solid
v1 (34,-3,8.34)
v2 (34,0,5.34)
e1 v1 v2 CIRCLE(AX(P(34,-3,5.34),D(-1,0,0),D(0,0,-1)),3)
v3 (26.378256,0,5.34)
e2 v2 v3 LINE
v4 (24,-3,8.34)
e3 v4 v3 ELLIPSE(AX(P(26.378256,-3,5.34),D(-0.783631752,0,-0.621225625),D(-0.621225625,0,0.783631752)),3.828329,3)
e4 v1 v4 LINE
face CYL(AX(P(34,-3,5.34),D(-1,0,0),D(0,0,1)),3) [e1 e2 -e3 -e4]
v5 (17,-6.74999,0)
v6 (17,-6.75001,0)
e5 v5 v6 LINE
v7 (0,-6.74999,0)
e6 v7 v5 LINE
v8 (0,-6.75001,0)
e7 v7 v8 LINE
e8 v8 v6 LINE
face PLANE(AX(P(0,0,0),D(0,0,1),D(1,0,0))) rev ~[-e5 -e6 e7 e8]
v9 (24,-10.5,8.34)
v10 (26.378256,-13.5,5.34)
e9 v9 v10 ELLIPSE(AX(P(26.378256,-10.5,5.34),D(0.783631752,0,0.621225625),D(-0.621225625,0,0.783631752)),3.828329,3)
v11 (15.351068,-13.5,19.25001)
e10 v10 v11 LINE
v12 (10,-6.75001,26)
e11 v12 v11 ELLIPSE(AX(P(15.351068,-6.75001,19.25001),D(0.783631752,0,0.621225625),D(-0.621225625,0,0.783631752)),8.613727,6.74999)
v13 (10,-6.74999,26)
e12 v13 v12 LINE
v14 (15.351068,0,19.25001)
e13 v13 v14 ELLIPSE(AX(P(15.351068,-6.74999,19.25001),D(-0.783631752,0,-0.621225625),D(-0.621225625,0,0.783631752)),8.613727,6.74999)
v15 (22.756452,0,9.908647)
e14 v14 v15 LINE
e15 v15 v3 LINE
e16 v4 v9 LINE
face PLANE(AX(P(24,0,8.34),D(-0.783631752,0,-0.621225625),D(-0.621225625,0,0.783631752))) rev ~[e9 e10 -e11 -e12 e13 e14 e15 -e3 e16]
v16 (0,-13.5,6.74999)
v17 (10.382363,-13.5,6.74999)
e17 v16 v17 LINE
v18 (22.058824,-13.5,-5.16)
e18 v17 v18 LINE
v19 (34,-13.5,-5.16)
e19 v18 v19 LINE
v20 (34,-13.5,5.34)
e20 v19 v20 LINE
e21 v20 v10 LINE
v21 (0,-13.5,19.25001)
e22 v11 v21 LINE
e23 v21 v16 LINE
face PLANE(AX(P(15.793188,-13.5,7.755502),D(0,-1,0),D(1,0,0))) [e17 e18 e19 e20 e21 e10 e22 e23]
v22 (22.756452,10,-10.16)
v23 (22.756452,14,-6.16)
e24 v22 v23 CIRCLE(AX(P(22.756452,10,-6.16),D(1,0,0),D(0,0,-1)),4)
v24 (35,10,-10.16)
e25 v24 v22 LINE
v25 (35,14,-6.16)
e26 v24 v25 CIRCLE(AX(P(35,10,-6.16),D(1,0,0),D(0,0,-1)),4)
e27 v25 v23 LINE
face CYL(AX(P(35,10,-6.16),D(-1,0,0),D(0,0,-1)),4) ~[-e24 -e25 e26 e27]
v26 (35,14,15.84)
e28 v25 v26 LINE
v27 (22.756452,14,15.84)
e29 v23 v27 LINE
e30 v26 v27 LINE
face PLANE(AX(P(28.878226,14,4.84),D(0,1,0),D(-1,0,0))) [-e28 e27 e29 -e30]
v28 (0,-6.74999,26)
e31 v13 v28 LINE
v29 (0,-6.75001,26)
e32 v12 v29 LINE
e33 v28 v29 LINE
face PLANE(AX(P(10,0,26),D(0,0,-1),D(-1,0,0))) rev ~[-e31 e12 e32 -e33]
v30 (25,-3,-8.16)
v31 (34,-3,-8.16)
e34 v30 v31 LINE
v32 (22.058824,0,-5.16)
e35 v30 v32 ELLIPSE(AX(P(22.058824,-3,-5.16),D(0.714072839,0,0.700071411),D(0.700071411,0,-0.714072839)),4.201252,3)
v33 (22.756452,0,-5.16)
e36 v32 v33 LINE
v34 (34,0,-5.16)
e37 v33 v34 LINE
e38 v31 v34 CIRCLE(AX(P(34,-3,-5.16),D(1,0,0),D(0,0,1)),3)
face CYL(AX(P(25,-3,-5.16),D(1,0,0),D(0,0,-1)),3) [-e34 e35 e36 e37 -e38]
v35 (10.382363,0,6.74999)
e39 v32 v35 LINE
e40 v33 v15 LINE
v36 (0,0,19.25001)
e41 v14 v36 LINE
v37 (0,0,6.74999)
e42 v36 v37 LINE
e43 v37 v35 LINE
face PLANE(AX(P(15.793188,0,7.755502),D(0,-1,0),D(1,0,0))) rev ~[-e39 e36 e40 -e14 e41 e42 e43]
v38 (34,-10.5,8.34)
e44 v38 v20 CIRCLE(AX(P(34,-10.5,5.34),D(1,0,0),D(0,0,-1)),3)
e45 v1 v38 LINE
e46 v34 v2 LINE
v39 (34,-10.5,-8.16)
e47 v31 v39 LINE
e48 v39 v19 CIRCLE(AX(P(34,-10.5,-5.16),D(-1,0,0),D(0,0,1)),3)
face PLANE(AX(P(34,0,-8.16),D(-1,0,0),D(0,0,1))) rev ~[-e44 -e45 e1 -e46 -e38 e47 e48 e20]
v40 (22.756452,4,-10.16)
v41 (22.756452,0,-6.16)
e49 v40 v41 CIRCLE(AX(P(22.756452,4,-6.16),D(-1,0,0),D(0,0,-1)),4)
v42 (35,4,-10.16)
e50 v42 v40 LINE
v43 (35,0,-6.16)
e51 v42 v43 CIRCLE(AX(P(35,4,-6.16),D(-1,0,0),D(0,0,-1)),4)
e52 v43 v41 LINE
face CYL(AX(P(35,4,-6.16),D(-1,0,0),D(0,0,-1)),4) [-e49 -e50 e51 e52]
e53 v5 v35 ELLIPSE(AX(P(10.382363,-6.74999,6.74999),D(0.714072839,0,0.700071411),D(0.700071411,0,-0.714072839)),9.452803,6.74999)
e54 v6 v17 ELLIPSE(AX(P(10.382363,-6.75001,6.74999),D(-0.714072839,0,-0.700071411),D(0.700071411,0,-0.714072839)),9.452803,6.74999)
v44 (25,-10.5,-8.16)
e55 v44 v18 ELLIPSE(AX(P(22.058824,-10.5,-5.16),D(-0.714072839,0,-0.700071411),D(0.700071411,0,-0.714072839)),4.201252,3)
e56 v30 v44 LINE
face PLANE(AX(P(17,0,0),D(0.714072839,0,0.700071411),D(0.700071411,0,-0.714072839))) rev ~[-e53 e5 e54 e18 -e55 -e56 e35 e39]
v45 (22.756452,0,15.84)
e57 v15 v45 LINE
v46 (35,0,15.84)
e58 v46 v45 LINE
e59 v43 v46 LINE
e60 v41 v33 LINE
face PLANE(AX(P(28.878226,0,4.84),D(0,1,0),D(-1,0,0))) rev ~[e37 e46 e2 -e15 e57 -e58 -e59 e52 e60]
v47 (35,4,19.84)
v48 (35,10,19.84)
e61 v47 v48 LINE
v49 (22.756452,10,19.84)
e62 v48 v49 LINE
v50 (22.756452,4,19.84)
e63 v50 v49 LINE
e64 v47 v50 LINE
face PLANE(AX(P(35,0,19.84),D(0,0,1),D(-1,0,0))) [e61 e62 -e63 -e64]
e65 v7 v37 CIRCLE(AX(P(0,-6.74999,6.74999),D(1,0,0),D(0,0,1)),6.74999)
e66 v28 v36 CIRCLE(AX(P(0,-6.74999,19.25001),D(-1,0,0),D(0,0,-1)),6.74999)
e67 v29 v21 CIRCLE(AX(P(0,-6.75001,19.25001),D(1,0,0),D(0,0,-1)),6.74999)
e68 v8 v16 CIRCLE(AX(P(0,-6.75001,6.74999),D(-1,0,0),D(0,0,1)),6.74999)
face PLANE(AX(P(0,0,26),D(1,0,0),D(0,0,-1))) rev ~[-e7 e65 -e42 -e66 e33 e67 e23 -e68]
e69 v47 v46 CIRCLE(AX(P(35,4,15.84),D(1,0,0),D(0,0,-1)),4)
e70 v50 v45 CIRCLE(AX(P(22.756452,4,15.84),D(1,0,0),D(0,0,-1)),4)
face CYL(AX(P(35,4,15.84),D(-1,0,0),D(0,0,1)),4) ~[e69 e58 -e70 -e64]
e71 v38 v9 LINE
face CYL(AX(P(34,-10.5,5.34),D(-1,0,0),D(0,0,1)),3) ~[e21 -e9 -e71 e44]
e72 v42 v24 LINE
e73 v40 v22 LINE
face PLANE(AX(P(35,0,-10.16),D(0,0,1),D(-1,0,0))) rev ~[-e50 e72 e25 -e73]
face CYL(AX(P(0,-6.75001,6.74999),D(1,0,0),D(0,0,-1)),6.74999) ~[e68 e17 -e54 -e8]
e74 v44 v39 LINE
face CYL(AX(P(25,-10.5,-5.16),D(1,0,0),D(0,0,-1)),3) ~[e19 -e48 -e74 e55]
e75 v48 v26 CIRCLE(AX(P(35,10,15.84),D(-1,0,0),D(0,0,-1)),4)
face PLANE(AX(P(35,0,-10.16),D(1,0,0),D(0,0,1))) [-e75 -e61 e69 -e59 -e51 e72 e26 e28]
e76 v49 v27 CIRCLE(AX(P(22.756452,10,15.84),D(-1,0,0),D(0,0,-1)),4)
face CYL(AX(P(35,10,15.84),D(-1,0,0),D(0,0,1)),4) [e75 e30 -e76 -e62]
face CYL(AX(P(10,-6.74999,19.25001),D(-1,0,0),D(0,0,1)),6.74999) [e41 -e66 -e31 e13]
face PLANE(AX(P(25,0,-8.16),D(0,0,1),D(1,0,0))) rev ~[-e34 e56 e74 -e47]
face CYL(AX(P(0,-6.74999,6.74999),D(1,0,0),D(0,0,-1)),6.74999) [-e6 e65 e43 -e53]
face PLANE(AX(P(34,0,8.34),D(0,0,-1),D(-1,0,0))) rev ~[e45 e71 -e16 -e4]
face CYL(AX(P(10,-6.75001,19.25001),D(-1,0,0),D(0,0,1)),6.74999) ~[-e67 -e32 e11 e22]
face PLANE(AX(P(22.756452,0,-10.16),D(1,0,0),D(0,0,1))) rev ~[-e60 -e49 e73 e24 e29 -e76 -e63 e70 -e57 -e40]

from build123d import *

# Parameters (mm, degrees)
F1_DEPTH = 13.5
F2_R     = 6.74999
F3_R     = 3
F4_W     = 12.2435482951
F4_H     = 30
F5_DEPTH = 14
F6_R     = 4


# Not quite as in the source:
# - a fillet or chamfer is up to 0.001 mm smaller than in the source, because OpenCascade refuses the exact size


with BuildPart() as f1:
    # F0 (on Front) → F1 (new body)
    with BuildSketch(Plane.XZ):
        Polygon((0, 26), (0, 0), (17, 0), (25, -8.16), (34, -8.16), (34, 8.34), (24, 8.34), (10, 26), align=None)
    extrude(amount=F1_DEPTH)

    # F2 (radius 6.75 in the source; OpenCascade refuses exactly that, so slightly less here)
    f2_edges = [f1.edges().sort_by_distance(p)[0] for p in [
        (5, 0, 26),
        (5, -13.5, 26),
        (8.5, 0, 0),
        (8.5, -13.5, 0),
    ]]
    fillet(f2_edges, radius=F2_R)

    # F3
    f3_edges = [f1.edges().sort_by_distance(p)[0] for p in [
        (29, -13.5, 8.34),
        (29, 0, 8.34),
        (29.5, 0, -8.16),
        (29.5, -13.5, -8.16),
    ]]
    fillet(f3_edges, radius=F3_R)

    # F4 (on face) → F5 (join)
    with BuildSketch(Plane(origin=(0, 0, 0), x_dir=(-1, 0, 0), z_dir=(0, 1, 0))):
        with Locations((-28.8782258524, 4.84)):
            Rectangle(F4_W, F4_H)
    extrude(amount=F5_DEPTH)

    # F6
    f6_edges = [f1.edges().sort_by_distance(p)[0] for p in [
        (28.878226, 14, 19.84),
        (28.878226, 0, 19.84),
        (28.878226, 14, -10.16),
        (28.878226, 0, -10.16),
    ]]
    fillet(f6_edges, radius=F6_R)


solid = f1.part
